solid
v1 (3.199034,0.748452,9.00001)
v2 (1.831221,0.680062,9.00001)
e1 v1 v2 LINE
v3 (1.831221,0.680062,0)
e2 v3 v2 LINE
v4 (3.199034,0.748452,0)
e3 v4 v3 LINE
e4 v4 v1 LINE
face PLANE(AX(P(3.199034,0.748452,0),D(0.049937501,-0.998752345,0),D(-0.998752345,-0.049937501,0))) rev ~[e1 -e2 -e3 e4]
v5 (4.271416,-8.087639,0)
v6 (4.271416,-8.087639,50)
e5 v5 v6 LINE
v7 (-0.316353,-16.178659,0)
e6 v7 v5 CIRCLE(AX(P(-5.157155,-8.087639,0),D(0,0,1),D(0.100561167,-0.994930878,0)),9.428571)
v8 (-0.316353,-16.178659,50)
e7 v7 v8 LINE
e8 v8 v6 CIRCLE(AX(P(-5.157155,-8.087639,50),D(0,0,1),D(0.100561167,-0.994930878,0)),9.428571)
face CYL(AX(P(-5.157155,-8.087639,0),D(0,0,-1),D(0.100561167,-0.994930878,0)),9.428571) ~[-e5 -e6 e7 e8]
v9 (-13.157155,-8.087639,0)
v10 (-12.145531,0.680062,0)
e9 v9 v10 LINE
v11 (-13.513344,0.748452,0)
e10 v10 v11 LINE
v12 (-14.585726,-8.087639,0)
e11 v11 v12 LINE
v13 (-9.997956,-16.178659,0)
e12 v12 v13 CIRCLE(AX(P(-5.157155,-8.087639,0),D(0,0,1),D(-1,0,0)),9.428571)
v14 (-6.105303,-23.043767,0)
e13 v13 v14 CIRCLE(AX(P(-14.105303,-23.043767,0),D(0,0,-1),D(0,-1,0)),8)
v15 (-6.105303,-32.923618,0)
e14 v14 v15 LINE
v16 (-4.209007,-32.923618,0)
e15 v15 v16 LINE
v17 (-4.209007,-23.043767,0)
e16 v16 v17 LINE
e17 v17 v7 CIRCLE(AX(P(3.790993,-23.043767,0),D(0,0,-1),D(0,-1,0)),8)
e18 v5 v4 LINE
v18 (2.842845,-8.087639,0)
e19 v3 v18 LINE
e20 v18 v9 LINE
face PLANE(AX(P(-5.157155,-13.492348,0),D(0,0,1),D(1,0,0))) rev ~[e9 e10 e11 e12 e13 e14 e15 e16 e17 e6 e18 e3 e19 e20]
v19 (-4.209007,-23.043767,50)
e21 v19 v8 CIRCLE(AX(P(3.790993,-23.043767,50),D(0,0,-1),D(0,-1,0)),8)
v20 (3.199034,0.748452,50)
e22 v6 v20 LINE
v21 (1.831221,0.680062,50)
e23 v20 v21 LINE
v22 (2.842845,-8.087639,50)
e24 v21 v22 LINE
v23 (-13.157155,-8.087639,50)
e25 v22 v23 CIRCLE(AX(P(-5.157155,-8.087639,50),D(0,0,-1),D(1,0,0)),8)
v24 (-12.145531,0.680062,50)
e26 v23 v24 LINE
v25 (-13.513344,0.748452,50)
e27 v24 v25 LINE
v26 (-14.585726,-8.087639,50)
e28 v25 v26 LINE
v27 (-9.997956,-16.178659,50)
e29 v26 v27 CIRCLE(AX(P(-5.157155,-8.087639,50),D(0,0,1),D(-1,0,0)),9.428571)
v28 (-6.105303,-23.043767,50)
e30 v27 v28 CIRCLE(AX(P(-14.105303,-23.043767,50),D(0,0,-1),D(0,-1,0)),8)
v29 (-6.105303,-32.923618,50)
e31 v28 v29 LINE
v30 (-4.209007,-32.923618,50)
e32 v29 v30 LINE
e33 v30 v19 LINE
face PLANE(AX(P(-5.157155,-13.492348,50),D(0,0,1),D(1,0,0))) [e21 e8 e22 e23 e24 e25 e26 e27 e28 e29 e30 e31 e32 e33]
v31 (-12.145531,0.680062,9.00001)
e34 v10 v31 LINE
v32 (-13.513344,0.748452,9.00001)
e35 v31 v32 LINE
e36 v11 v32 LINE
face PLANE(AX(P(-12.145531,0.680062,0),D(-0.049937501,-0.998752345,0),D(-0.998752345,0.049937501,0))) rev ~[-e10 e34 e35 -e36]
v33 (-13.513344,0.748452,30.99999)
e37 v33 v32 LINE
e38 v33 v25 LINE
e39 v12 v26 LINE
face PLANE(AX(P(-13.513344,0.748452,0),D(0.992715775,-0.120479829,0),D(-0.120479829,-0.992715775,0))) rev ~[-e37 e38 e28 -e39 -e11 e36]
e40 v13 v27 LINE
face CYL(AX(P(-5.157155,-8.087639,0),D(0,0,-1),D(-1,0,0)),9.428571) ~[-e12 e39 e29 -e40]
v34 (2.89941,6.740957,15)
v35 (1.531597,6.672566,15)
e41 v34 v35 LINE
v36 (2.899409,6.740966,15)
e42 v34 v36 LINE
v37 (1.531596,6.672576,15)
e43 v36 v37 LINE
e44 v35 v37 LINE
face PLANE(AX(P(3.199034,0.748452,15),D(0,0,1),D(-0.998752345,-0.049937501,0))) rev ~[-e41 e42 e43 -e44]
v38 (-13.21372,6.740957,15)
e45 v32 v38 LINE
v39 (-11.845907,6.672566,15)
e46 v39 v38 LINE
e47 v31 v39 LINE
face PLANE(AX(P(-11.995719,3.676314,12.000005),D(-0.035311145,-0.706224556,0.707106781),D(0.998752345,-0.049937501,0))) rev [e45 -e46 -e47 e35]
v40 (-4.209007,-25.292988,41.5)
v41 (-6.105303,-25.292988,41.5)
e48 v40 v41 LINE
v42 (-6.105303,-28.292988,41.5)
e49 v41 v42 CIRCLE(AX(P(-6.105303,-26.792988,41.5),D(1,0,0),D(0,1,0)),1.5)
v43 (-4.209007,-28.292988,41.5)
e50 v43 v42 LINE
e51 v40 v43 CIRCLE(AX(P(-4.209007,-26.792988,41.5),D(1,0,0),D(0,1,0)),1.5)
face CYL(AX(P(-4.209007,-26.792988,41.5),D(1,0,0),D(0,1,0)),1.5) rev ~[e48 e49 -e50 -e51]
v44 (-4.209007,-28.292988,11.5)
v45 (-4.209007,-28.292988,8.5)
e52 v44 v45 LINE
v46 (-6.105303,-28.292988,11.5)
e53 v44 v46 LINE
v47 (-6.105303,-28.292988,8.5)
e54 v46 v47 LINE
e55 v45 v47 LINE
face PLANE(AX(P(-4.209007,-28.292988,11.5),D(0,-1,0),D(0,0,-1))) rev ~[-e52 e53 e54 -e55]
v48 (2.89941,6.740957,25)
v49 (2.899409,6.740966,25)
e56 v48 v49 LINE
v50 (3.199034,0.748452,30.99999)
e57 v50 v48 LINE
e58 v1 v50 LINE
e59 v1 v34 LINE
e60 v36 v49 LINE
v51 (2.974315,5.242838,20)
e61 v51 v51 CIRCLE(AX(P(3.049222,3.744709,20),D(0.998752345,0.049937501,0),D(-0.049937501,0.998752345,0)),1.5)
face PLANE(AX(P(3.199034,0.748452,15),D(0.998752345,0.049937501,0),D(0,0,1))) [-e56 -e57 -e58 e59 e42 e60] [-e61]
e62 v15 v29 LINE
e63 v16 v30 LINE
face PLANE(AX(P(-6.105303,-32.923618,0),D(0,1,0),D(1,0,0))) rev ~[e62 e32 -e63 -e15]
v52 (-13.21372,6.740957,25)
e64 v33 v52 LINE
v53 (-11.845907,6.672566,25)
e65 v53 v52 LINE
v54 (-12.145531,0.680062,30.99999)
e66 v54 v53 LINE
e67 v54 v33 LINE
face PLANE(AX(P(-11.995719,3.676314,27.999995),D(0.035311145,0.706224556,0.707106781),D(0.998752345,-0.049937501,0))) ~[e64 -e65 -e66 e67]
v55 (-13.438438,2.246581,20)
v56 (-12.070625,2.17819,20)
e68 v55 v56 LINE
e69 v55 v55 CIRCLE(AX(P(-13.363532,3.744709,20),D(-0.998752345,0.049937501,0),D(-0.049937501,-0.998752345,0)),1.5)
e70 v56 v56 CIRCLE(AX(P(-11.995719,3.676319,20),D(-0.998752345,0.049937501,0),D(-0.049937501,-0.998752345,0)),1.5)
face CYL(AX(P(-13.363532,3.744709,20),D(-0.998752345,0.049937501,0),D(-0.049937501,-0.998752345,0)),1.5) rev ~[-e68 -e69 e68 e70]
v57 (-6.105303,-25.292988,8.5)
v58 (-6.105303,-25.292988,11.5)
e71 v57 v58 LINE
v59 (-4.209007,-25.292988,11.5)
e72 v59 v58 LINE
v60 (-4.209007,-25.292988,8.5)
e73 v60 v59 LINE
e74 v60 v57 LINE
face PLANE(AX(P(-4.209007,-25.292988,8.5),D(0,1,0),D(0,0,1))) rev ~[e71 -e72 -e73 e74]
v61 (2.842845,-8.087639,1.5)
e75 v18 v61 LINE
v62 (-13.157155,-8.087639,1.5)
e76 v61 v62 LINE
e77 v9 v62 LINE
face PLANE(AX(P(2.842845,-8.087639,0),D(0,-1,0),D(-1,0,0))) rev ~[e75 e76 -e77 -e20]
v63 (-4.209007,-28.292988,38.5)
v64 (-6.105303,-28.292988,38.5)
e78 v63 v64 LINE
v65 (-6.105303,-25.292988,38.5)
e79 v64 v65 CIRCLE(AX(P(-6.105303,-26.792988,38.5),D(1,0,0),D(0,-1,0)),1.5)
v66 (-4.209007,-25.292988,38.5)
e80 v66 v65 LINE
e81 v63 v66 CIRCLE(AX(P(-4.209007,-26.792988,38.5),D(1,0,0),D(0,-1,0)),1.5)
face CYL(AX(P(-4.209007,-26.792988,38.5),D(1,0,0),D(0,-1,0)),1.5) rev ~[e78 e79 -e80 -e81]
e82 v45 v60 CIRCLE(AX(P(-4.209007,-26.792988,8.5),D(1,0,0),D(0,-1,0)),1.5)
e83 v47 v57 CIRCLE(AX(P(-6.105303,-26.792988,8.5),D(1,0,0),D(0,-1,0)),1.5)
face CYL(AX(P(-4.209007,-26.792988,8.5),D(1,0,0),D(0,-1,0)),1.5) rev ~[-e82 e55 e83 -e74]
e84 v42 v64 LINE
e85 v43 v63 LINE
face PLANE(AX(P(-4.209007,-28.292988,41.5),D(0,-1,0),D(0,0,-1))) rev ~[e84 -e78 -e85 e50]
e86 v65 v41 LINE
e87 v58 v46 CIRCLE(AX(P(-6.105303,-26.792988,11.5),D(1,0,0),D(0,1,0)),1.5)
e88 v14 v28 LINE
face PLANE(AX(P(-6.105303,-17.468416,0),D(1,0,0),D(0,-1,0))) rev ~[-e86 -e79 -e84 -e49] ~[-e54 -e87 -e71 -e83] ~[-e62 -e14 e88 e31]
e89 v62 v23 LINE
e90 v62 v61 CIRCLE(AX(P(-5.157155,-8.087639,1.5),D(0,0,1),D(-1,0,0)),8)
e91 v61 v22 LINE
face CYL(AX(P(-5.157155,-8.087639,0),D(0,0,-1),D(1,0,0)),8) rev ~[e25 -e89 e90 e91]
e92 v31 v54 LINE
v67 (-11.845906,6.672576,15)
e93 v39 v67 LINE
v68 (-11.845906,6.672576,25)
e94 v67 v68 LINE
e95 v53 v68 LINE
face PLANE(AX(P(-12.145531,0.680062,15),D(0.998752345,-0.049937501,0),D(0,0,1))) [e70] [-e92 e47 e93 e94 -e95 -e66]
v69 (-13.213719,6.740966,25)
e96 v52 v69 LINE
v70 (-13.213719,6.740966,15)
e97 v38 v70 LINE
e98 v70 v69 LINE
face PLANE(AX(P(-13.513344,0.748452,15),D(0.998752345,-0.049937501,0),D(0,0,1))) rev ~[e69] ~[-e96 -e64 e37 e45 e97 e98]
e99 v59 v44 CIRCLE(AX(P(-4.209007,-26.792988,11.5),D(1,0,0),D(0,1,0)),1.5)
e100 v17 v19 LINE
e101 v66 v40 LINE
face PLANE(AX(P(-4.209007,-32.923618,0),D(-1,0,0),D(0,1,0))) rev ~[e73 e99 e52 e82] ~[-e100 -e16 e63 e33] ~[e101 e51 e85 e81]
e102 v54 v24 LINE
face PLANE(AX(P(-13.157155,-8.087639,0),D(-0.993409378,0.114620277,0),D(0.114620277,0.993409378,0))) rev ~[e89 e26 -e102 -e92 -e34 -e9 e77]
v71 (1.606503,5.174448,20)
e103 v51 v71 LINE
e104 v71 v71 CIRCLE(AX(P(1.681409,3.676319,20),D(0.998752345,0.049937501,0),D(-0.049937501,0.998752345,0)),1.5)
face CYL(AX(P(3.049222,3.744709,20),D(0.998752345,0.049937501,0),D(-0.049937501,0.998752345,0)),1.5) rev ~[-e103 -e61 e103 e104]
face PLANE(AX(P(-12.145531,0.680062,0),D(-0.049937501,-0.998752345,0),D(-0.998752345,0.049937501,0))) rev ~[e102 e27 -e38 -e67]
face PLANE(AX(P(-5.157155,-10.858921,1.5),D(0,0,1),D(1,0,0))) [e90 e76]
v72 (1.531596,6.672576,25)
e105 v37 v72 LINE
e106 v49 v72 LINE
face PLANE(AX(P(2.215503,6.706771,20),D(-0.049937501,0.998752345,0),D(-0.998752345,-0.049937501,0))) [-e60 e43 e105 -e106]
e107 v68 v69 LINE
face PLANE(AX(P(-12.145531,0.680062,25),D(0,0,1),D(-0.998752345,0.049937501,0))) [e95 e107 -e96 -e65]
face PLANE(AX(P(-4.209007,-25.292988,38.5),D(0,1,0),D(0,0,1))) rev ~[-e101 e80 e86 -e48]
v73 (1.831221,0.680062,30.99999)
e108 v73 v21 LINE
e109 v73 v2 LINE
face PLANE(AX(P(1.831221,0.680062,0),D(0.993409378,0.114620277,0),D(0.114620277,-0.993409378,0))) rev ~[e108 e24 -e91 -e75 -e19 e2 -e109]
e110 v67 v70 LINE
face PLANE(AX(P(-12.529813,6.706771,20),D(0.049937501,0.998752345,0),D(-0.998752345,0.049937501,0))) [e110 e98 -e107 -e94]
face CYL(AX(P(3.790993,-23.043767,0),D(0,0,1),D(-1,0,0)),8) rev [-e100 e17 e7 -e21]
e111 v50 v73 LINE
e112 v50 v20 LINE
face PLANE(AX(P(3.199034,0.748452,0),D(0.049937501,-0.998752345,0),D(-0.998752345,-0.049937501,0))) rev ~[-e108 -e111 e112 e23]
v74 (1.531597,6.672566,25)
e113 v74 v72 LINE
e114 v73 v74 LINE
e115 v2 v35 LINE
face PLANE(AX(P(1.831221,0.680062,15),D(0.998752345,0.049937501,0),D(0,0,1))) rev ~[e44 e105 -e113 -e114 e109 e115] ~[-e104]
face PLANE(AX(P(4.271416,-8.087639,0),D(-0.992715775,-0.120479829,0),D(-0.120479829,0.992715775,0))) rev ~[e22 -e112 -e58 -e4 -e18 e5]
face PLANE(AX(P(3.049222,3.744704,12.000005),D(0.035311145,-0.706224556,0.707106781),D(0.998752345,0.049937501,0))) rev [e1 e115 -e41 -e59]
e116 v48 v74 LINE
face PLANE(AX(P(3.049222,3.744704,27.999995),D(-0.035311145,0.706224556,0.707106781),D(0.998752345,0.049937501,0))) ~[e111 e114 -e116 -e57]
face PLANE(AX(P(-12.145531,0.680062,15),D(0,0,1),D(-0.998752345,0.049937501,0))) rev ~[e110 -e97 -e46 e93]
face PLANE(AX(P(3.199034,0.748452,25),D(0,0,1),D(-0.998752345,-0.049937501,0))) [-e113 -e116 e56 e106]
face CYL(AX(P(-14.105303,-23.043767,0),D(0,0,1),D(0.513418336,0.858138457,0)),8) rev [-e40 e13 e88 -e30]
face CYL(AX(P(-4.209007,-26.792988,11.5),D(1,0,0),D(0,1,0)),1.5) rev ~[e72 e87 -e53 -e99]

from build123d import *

# Parameters (mm, degrees)
F1_DEPTH  = 1.5
F2_DEPTH  = 50
F3_R      = 8
F4_W      = 1.3695214008
F4_H      = 10
F6_DEPTH  = 6
F5_W      = 1.3695214008
F5_H      = 10
F7_DEPTH  = 6
F8_R      = 1.5
F9_DEPTH  = 2
F10_R     = 1.5
F11_DEPTH = 2
F12_SIZE  = 5.99999
F14_DEPTH = 3


# Not quite as in the source:
# - a fillet or chamfer is up to 0.001 mm smaller than in the source, because OpenCascade refuses the exact size


with BuildPart() as f1:
    # F0 (on Top) → F1 (new body)
    with BuildSketch(Plane.XY):
        with BuildLine():
            Line((-8.8714406544, -8.0876392549), (-13.1571549401, -8.0876392549))
            ThreePointArc((-13.1571549401, -8.0876392549), (-5.1571549401, -16.0876392549), (2.8428450599, -8.0876392549))
            Line((2.8428450599, -8.0876392549), (-1.4428692258, -8.0876392549))
            Line((-1.4428692258, -8.0876392549), (-8.8714406544, -8.0876392549))
        make_face()
    extrude(amount=F1_DEPTH)

    # F0 (on Top) → F2 (join)
    with BuildSketch(Plane.XY):
        with BuildLine():
            ThreePointArc((2.8428450599, -8.0876392549), (-5.1571549401, -16.0876392549), (-13.1571549401, -8.0876392549))
            Line((-13.1571549401, -8.0876392549), (-12.1455313702, 0.680061955))
            Line((-12.1455313702, 0.680061955), (-13.5133440803, 0.7484524309))
            Line((-13.5133440803, 0.7484524309), (-14.5857263686, -8.0876392549))
            ThreePointArc((-14.5857263686, -8.0876392549), (-12.1513540266, -14.4105450997), (-6.1053030882, -17.4684161029))
            Line((-6.1053030882, -17.4684161029), (-6.1053030882, -32.9236180908))
            Line((-6.1053030882, -32.9236180908), (-4.2090067919, -32.9236180908))
            Line((-4.2090067919, -32.9236180908), (-4.2090067919, -17.4684161029))
            ThreePointArc((-4.2090067919, -17.4684161029), (1.8370441464, -14.4105450997), (4.2714164885, -8.0876392549))
            Line((4.2714164885, -8.0876392549), (3.1990342002, 0.7484524309))
            Line((3.1990342002, 0.7484524309), (1.83122149, 0.680061955))
            Line((1.83122149, 0.680061955), (2.8428450599, -8.0876392549))
        make_face()
    extrude(amount=F2_DEPTH)

    # F3
    f3_edges = [f1.edges().sort_by_distance(p)[0] for p in [
        (-6.105303, -17.468416, 25),
        (-4.209007, -17.468416, 25),
    ]]
    fillet(f3_edges, radius=F3_R)

    # F4 (on face) → F6 (join)
    with BuildSketch(Plane(origin=(-0.0293516073, 0.5870335173, 0), x_dir=(-0.9987523447, -0.0499375007, 0), z_dir=(-0.0499375007, 0.9987523447, 0))):
        with Locations((-2.5476580515, 20)):
            Rectangle(F4_W, F4_H)
    extrude(amount=F6_DEPTH)

    # F5 (on face) → F7 (join)
    with BuildSketch(Plane(origin=(0.0036302561, 0.0726052918, 0), x_dir=(-0.9987523447, 0.0499375007, 0), z_dir=(0.0499375007, 0.9987523447, 0))):
        with Locations((12.8490992282, 20)):
            Rectangle(F5_W, F5_H)
    extrude(amount=F7_DEPTH)

    # F8 (on face) → F9 (cut)
    with BuildSketch(Plane(origin=(3.2283858075, 0.1614189135, 0), x_dir=(-0.0499375007, 0.9987523447, 0), z_dir=(0.9987523447, 0.0499375007, 0))):
        with Locations((3.5877668478, 20)):
            Circle(F8_R)
    extrude(amount=-F9_DEPTH, mode=Mode.SUBTRACT)

    # F10 (on face) → F11 (cut)
    with BuildSketch(Plane(origin=(-13.5169743364, 0.6758471391, 0), x_dir=(-0.0499375007, -0.9987523447, 0), z_dir=(-0.9987523447, 0.0499375007, 0))):
        with Locations((-3.0726959913, 20)):
            Circle(F10_R)
    extrude(amount=-F11_DEPTH, mode=Mode.SUBTRACT)

    # F12 (size 6 in the source; OpenCascade refuses exactly that, so slightly less here)
    f12_edges = [f1.edges().sort_by_distance(p)[0] for p in [
        (2.515128, 0.714257, 15),
        (-12.829438, 0.714257, 15),
        (2.515128, 0.714257, 25),
        (-12.829438, 0.714257, 25),
    ]]
    chamfer(f12_edges, length=F12_SIZE)

    # F13 (on face) → F14 (cut)
    with BuildSketch(Plane.YZ.offset(-4.2090067919)):
        with BuildLine():
            ThreePointArc((-28.2929875813, 38.5), (-26.7929875813, 37), (-25.2929875813, 38.5))
            Line((-25.2929875813, 38.5), (-25.2929875813, 41.5))
            ThreePointArc((-25.2929875813, 41.5), (-26.7929875813, 43), (-28.2929875813, 41.5))
            Line((-28.2929875813, 41.5), (-28.2929875813, 38.5))
        make_face()
        with BuildLine():
            ThreePointArc((-28.2929875813, 8.5), (-26.7929875813, 7), (-25.2929875813, 8.5))
            Line((-25.2929875813, 8.5), (-25.2929875813, 11.5))
            ThreePointArc((-25.2929875813, 11.5), (-26.7929875813, 13), (-28.2929875813, 11.5))
            Line((-28.2929875813, 11.5), (-28.2929875813, 8.5))
        make_face()
    extrude(amount=-F14_DEPTH, mode=Mode.SUBTRACT)


solid = f1.part
